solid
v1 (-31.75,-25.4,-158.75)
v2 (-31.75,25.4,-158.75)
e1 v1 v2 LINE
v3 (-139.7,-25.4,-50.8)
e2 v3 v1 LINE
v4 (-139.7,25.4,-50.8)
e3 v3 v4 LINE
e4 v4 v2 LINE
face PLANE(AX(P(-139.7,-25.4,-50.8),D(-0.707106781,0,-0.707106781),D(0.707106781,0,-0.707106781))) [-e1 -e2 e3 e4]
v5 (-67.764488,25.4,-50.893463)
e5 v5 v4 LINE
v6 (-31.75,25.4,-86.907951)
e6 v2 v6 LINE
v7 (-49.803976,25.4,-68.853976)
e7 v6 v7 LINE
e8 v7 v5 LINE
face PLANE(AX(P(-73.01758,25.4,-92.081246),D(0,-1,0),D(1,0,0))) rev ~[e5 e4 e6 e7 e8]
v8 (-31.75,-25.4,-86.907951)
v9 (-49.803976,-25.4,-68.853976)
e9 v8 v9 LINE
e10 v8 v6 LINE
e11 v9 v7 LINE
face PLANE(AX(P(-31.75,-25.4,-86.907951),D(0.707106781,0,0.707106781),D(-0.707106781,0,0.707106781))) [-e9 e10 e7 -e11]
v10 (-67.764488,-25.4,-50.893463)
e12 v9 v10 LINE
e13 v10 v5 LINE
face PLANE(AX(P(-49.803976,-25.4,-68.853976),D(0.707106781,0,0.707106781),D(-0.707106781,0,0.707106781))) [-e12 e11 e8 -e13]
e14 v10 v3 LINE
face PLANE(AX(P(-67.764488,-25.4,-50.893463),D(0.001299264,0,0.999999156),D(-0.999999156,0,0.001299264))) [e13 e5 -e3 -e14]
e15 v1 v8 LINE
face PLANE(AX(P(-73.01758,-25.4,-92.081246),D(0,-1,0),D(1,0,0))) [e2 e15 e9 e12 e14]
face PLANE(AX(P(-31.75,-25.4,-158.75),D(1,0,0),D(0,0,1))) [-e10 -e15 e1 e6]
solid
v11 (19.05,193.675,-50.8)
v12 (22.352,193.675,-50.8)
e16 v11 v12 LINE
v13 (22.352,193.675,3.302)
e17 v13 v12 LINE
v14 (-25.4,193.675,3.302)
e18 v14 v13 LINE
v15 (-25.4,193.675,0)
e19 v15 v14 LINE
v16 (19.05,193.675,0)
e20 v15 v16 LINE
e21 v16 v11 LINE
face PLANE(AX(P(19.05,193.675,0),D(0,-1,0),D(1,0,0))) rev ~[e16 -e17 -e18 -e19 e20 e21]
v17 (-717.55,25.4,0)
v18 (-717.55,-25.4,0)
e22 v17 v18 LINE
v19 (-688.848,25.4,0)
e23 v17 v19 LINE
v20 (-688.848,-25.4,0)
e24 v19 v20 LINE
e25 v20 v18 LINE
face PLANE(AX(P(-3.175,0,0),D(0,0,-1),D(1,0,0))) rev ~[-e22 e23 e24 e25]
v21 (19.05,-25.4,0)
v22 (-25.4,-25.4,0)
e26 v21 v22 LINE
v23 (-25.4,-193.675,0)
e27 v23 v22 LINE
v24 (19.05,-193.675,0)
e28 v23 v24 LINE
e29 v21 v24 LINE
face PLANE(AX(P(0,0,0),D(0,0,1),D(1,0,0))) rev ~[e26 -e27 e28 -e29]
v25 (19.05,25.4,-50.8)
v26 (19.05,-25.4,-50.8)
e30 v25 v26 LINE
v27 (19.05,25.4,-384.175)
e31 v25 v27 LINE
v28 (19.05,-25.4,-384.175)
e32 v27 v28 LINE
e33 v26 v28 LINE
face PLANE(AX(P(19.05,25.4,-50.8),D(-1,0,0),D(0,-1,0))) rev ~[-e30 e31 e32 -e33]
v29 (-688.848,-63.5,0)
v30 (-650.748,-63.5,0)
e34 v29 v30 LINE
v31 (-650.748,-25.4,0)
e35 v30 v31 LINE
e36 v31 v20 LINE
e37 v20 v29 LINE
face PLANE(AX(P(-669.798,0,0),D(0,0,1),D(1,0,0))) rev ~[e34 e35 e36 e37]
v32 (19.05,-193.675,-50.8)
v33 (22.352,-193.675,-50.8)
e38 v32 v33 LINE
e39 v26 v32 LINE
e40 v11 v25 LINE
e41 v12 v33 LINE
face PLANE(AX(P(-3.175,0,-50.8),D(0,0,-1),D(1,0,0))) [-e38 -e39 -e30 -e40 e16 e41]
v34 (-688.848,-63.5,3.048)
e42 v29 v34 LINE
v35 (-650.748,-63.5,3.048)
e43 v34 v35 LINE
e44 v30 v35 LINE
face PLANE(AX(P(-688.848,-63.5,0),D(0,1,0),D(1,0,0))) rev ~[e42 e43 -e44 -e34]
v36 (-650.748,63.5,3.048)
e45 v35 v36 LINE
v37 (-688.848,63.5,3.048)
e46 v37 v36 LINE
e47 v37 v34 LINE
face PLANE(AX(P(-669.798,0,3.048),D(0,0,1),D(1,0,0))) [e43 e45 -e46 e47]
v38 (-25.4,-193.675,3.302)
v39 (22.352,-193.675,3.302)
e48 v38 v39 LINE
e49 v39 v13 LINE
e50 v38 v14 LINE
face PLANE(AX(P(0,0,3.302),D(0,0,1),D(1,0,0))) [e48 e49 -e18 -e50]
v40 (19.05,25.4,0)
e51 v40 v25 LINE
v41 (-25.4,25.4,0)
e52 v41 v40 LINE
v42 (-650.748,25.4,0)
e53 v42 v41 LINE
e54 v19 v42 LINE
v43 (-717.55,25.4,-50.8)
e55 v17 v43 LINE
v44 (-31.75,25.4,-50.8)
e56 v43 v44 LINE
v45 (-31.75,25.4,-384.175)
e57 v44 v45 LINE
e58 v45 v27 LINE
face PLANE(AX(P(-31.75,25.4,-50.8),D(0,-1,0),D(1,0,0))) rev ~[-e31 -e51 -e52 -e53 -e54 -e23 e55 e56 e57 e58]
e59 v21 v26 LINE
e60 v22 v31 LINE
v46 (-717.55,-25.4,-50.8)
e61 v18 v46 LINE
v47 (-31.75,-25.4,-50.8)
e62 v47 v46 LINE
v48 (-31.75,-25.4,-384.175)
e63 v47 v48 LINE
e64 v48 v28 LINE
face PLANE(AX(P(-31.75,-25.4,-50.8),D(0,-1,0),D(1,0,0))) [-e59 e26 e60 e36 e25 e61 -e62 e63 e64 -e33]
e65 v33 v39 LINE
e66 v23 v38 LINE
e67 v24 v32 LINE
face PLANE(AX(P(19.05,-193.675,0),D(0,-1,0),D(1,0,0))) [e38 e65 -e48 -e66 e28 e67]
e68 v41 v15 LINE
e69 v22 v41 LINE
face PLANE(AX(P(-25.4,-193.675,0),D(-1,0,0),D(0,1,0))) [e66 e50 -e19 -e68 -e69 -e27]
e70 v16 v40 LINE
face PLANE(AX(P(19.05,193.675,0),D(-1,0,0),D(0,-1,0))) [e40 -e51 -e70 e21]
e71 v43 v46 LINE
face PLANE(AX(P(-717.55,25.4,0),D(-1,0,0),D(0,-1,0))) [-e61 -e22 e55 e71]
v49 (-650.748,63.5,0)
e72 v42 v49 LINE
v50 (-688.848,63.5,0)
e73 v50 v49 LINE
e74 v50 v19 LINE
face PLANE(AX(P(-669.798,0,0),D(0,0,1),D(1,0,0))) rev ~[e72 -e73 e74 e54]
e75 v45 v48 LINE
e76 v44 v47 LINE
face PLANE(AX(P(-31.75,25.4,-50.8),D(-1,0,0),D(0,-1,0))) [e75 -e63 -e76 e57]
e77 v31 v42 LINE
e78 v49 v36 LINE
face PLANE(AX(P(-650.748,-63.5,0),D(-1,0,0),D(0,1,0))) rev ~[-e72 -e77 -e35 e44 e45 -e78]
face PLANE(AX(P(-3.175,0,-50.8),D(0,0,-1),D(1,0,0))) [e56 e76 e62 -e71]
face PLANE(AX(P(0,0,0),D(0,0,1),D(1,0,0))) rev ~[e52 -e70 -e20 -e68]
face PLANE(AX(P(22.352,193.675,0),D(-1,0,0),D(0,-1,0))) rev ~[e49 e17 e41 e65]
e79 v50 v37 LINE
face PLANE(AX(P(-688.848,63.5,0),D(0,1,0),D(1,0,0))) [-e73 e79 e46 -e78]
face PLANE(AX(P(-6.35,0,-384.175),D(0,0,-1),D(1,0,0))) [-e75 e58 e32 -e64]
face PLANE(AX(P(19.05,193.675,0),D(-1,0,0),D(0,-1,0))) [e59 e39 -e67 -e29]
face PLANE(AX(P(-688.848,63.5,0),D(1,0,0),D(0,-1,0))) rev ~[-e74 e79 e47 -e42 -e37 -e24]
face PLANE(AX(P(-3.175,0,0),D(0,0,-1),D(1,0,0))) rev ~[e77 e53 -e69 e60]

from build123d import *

# Parameters (mm, degrees)
F0_W      = 50.8
F0_H      = 387.35
F1_DEPTH  = 6.35
F2_W      = 6.35
F2_H      = 387.35
F3_DEPTH  = 50.8
F4_DEPTH  = 3.048
F5_DEPTH  = 3.048
F6_W      = 692.15
F6_H      = 50.8
F7_DEPTH  = 50.8
F8_W      = 38.1
F8_H      = 50.8
F8_H_2    = 38.1
F9_DEPTH  = 3.048
F10_W     = 50.8
F10_H     = 50.8
F11_DEPTH = 333.375
F13_DEPTH = 50.8


# Not quite as in the source:
# - a feature names something its author has since deleted; it is built from what else it names


with BuildPart() as f1:
    # F0 (on Top) → F1 (new body)
    with BuildSketch(Plane.XY):
        Rectangle(F0_W, F0_H)
    extrude(amount=F1_DEPTH)

    # F2 (on face) → F3 (join)
    with BuildSketch(Plane(origin=(0, 0, 0), x_dir=(1, 0, 0), z_dir=(0, 0, -1))):
        with Locations((22.225, 0)):
            Rectangle(F2_W, F2_H)
    extrude(amount=F3_DEPTH)

    # F4 (cut): a face of the model
    f4_faces = [f1.faces().sort_by_distance(p)[0] for p in [
        (25.4, 0, -22.225),
    ]]
    extrude(f4_faces, amount=-F4_DEPTH, mode=Mode.SUBTRACT)

    # F5 (cut): a face of the model
    f5_faces = [f1.faces().sort_by_distance(p)[0] for p in [
        (-1.524, 0, 6.35),
    ]]
    extrude(f5_faces, amount=-F5_DEPTH, mode=Mode.SUBTRACT)

    # F6 (on face) → F7 (join)
    with BuildSketch(Plane(origin=(0, 0, 0), x_dir=(1, 0, 0), z_dir=(0, 0, -1))):
        Polygon((19.05, -25.4), (19.05, 0), (19.05, 25.4), (-25.4, 25.4), (-25.4, -25.4), align=None)
        with Locations((-371.475, 0)):
            Rectangle(F6_W, F6_H)
    extrude(amount=F7_DEPTH)

    # F8 (on face) → F9 (join)
    with BuildSketch(Plane.XY):
        with Locations((-669.798, 0)):
            Rectangle(F8_W, F8_H)
        with Locations((-669.798, 44.45)):
            Rectangle(F8_W, F8_H_2)
        with Locations((-669.798, -44.45)):
            Rectangle(F8_W, F8_H_2)
    extrude(amount=F9_DEPTH)

    # F10 (on face) → F11 (join)
    with BuildSketch(Plane(origin=(0, 0, -50.8), x_dir=(1, 0, 0), z_dir=(0, 0, -1))):
        with Locations((-6.35, 0)):
            Rectangle(F10_W, F10_H)
    extrude(amount=F11_DEPTH)


with BuildPart() as f13:
    # F12 (on face) → F13 (new body)
    with BuildSketch(Plane.XZ.offset(25.4)):
        Polygon((-67.7644877579, -50.8934632736), (-139.7, -50.8), (-31.75, -158.75), (-31.75, -86.9079510314), (-49.8039755157, -68.8539755157), align=None)
    extrude(amount=-F13_DEPTH)


solid = Compound([f1.part, f13.part])
